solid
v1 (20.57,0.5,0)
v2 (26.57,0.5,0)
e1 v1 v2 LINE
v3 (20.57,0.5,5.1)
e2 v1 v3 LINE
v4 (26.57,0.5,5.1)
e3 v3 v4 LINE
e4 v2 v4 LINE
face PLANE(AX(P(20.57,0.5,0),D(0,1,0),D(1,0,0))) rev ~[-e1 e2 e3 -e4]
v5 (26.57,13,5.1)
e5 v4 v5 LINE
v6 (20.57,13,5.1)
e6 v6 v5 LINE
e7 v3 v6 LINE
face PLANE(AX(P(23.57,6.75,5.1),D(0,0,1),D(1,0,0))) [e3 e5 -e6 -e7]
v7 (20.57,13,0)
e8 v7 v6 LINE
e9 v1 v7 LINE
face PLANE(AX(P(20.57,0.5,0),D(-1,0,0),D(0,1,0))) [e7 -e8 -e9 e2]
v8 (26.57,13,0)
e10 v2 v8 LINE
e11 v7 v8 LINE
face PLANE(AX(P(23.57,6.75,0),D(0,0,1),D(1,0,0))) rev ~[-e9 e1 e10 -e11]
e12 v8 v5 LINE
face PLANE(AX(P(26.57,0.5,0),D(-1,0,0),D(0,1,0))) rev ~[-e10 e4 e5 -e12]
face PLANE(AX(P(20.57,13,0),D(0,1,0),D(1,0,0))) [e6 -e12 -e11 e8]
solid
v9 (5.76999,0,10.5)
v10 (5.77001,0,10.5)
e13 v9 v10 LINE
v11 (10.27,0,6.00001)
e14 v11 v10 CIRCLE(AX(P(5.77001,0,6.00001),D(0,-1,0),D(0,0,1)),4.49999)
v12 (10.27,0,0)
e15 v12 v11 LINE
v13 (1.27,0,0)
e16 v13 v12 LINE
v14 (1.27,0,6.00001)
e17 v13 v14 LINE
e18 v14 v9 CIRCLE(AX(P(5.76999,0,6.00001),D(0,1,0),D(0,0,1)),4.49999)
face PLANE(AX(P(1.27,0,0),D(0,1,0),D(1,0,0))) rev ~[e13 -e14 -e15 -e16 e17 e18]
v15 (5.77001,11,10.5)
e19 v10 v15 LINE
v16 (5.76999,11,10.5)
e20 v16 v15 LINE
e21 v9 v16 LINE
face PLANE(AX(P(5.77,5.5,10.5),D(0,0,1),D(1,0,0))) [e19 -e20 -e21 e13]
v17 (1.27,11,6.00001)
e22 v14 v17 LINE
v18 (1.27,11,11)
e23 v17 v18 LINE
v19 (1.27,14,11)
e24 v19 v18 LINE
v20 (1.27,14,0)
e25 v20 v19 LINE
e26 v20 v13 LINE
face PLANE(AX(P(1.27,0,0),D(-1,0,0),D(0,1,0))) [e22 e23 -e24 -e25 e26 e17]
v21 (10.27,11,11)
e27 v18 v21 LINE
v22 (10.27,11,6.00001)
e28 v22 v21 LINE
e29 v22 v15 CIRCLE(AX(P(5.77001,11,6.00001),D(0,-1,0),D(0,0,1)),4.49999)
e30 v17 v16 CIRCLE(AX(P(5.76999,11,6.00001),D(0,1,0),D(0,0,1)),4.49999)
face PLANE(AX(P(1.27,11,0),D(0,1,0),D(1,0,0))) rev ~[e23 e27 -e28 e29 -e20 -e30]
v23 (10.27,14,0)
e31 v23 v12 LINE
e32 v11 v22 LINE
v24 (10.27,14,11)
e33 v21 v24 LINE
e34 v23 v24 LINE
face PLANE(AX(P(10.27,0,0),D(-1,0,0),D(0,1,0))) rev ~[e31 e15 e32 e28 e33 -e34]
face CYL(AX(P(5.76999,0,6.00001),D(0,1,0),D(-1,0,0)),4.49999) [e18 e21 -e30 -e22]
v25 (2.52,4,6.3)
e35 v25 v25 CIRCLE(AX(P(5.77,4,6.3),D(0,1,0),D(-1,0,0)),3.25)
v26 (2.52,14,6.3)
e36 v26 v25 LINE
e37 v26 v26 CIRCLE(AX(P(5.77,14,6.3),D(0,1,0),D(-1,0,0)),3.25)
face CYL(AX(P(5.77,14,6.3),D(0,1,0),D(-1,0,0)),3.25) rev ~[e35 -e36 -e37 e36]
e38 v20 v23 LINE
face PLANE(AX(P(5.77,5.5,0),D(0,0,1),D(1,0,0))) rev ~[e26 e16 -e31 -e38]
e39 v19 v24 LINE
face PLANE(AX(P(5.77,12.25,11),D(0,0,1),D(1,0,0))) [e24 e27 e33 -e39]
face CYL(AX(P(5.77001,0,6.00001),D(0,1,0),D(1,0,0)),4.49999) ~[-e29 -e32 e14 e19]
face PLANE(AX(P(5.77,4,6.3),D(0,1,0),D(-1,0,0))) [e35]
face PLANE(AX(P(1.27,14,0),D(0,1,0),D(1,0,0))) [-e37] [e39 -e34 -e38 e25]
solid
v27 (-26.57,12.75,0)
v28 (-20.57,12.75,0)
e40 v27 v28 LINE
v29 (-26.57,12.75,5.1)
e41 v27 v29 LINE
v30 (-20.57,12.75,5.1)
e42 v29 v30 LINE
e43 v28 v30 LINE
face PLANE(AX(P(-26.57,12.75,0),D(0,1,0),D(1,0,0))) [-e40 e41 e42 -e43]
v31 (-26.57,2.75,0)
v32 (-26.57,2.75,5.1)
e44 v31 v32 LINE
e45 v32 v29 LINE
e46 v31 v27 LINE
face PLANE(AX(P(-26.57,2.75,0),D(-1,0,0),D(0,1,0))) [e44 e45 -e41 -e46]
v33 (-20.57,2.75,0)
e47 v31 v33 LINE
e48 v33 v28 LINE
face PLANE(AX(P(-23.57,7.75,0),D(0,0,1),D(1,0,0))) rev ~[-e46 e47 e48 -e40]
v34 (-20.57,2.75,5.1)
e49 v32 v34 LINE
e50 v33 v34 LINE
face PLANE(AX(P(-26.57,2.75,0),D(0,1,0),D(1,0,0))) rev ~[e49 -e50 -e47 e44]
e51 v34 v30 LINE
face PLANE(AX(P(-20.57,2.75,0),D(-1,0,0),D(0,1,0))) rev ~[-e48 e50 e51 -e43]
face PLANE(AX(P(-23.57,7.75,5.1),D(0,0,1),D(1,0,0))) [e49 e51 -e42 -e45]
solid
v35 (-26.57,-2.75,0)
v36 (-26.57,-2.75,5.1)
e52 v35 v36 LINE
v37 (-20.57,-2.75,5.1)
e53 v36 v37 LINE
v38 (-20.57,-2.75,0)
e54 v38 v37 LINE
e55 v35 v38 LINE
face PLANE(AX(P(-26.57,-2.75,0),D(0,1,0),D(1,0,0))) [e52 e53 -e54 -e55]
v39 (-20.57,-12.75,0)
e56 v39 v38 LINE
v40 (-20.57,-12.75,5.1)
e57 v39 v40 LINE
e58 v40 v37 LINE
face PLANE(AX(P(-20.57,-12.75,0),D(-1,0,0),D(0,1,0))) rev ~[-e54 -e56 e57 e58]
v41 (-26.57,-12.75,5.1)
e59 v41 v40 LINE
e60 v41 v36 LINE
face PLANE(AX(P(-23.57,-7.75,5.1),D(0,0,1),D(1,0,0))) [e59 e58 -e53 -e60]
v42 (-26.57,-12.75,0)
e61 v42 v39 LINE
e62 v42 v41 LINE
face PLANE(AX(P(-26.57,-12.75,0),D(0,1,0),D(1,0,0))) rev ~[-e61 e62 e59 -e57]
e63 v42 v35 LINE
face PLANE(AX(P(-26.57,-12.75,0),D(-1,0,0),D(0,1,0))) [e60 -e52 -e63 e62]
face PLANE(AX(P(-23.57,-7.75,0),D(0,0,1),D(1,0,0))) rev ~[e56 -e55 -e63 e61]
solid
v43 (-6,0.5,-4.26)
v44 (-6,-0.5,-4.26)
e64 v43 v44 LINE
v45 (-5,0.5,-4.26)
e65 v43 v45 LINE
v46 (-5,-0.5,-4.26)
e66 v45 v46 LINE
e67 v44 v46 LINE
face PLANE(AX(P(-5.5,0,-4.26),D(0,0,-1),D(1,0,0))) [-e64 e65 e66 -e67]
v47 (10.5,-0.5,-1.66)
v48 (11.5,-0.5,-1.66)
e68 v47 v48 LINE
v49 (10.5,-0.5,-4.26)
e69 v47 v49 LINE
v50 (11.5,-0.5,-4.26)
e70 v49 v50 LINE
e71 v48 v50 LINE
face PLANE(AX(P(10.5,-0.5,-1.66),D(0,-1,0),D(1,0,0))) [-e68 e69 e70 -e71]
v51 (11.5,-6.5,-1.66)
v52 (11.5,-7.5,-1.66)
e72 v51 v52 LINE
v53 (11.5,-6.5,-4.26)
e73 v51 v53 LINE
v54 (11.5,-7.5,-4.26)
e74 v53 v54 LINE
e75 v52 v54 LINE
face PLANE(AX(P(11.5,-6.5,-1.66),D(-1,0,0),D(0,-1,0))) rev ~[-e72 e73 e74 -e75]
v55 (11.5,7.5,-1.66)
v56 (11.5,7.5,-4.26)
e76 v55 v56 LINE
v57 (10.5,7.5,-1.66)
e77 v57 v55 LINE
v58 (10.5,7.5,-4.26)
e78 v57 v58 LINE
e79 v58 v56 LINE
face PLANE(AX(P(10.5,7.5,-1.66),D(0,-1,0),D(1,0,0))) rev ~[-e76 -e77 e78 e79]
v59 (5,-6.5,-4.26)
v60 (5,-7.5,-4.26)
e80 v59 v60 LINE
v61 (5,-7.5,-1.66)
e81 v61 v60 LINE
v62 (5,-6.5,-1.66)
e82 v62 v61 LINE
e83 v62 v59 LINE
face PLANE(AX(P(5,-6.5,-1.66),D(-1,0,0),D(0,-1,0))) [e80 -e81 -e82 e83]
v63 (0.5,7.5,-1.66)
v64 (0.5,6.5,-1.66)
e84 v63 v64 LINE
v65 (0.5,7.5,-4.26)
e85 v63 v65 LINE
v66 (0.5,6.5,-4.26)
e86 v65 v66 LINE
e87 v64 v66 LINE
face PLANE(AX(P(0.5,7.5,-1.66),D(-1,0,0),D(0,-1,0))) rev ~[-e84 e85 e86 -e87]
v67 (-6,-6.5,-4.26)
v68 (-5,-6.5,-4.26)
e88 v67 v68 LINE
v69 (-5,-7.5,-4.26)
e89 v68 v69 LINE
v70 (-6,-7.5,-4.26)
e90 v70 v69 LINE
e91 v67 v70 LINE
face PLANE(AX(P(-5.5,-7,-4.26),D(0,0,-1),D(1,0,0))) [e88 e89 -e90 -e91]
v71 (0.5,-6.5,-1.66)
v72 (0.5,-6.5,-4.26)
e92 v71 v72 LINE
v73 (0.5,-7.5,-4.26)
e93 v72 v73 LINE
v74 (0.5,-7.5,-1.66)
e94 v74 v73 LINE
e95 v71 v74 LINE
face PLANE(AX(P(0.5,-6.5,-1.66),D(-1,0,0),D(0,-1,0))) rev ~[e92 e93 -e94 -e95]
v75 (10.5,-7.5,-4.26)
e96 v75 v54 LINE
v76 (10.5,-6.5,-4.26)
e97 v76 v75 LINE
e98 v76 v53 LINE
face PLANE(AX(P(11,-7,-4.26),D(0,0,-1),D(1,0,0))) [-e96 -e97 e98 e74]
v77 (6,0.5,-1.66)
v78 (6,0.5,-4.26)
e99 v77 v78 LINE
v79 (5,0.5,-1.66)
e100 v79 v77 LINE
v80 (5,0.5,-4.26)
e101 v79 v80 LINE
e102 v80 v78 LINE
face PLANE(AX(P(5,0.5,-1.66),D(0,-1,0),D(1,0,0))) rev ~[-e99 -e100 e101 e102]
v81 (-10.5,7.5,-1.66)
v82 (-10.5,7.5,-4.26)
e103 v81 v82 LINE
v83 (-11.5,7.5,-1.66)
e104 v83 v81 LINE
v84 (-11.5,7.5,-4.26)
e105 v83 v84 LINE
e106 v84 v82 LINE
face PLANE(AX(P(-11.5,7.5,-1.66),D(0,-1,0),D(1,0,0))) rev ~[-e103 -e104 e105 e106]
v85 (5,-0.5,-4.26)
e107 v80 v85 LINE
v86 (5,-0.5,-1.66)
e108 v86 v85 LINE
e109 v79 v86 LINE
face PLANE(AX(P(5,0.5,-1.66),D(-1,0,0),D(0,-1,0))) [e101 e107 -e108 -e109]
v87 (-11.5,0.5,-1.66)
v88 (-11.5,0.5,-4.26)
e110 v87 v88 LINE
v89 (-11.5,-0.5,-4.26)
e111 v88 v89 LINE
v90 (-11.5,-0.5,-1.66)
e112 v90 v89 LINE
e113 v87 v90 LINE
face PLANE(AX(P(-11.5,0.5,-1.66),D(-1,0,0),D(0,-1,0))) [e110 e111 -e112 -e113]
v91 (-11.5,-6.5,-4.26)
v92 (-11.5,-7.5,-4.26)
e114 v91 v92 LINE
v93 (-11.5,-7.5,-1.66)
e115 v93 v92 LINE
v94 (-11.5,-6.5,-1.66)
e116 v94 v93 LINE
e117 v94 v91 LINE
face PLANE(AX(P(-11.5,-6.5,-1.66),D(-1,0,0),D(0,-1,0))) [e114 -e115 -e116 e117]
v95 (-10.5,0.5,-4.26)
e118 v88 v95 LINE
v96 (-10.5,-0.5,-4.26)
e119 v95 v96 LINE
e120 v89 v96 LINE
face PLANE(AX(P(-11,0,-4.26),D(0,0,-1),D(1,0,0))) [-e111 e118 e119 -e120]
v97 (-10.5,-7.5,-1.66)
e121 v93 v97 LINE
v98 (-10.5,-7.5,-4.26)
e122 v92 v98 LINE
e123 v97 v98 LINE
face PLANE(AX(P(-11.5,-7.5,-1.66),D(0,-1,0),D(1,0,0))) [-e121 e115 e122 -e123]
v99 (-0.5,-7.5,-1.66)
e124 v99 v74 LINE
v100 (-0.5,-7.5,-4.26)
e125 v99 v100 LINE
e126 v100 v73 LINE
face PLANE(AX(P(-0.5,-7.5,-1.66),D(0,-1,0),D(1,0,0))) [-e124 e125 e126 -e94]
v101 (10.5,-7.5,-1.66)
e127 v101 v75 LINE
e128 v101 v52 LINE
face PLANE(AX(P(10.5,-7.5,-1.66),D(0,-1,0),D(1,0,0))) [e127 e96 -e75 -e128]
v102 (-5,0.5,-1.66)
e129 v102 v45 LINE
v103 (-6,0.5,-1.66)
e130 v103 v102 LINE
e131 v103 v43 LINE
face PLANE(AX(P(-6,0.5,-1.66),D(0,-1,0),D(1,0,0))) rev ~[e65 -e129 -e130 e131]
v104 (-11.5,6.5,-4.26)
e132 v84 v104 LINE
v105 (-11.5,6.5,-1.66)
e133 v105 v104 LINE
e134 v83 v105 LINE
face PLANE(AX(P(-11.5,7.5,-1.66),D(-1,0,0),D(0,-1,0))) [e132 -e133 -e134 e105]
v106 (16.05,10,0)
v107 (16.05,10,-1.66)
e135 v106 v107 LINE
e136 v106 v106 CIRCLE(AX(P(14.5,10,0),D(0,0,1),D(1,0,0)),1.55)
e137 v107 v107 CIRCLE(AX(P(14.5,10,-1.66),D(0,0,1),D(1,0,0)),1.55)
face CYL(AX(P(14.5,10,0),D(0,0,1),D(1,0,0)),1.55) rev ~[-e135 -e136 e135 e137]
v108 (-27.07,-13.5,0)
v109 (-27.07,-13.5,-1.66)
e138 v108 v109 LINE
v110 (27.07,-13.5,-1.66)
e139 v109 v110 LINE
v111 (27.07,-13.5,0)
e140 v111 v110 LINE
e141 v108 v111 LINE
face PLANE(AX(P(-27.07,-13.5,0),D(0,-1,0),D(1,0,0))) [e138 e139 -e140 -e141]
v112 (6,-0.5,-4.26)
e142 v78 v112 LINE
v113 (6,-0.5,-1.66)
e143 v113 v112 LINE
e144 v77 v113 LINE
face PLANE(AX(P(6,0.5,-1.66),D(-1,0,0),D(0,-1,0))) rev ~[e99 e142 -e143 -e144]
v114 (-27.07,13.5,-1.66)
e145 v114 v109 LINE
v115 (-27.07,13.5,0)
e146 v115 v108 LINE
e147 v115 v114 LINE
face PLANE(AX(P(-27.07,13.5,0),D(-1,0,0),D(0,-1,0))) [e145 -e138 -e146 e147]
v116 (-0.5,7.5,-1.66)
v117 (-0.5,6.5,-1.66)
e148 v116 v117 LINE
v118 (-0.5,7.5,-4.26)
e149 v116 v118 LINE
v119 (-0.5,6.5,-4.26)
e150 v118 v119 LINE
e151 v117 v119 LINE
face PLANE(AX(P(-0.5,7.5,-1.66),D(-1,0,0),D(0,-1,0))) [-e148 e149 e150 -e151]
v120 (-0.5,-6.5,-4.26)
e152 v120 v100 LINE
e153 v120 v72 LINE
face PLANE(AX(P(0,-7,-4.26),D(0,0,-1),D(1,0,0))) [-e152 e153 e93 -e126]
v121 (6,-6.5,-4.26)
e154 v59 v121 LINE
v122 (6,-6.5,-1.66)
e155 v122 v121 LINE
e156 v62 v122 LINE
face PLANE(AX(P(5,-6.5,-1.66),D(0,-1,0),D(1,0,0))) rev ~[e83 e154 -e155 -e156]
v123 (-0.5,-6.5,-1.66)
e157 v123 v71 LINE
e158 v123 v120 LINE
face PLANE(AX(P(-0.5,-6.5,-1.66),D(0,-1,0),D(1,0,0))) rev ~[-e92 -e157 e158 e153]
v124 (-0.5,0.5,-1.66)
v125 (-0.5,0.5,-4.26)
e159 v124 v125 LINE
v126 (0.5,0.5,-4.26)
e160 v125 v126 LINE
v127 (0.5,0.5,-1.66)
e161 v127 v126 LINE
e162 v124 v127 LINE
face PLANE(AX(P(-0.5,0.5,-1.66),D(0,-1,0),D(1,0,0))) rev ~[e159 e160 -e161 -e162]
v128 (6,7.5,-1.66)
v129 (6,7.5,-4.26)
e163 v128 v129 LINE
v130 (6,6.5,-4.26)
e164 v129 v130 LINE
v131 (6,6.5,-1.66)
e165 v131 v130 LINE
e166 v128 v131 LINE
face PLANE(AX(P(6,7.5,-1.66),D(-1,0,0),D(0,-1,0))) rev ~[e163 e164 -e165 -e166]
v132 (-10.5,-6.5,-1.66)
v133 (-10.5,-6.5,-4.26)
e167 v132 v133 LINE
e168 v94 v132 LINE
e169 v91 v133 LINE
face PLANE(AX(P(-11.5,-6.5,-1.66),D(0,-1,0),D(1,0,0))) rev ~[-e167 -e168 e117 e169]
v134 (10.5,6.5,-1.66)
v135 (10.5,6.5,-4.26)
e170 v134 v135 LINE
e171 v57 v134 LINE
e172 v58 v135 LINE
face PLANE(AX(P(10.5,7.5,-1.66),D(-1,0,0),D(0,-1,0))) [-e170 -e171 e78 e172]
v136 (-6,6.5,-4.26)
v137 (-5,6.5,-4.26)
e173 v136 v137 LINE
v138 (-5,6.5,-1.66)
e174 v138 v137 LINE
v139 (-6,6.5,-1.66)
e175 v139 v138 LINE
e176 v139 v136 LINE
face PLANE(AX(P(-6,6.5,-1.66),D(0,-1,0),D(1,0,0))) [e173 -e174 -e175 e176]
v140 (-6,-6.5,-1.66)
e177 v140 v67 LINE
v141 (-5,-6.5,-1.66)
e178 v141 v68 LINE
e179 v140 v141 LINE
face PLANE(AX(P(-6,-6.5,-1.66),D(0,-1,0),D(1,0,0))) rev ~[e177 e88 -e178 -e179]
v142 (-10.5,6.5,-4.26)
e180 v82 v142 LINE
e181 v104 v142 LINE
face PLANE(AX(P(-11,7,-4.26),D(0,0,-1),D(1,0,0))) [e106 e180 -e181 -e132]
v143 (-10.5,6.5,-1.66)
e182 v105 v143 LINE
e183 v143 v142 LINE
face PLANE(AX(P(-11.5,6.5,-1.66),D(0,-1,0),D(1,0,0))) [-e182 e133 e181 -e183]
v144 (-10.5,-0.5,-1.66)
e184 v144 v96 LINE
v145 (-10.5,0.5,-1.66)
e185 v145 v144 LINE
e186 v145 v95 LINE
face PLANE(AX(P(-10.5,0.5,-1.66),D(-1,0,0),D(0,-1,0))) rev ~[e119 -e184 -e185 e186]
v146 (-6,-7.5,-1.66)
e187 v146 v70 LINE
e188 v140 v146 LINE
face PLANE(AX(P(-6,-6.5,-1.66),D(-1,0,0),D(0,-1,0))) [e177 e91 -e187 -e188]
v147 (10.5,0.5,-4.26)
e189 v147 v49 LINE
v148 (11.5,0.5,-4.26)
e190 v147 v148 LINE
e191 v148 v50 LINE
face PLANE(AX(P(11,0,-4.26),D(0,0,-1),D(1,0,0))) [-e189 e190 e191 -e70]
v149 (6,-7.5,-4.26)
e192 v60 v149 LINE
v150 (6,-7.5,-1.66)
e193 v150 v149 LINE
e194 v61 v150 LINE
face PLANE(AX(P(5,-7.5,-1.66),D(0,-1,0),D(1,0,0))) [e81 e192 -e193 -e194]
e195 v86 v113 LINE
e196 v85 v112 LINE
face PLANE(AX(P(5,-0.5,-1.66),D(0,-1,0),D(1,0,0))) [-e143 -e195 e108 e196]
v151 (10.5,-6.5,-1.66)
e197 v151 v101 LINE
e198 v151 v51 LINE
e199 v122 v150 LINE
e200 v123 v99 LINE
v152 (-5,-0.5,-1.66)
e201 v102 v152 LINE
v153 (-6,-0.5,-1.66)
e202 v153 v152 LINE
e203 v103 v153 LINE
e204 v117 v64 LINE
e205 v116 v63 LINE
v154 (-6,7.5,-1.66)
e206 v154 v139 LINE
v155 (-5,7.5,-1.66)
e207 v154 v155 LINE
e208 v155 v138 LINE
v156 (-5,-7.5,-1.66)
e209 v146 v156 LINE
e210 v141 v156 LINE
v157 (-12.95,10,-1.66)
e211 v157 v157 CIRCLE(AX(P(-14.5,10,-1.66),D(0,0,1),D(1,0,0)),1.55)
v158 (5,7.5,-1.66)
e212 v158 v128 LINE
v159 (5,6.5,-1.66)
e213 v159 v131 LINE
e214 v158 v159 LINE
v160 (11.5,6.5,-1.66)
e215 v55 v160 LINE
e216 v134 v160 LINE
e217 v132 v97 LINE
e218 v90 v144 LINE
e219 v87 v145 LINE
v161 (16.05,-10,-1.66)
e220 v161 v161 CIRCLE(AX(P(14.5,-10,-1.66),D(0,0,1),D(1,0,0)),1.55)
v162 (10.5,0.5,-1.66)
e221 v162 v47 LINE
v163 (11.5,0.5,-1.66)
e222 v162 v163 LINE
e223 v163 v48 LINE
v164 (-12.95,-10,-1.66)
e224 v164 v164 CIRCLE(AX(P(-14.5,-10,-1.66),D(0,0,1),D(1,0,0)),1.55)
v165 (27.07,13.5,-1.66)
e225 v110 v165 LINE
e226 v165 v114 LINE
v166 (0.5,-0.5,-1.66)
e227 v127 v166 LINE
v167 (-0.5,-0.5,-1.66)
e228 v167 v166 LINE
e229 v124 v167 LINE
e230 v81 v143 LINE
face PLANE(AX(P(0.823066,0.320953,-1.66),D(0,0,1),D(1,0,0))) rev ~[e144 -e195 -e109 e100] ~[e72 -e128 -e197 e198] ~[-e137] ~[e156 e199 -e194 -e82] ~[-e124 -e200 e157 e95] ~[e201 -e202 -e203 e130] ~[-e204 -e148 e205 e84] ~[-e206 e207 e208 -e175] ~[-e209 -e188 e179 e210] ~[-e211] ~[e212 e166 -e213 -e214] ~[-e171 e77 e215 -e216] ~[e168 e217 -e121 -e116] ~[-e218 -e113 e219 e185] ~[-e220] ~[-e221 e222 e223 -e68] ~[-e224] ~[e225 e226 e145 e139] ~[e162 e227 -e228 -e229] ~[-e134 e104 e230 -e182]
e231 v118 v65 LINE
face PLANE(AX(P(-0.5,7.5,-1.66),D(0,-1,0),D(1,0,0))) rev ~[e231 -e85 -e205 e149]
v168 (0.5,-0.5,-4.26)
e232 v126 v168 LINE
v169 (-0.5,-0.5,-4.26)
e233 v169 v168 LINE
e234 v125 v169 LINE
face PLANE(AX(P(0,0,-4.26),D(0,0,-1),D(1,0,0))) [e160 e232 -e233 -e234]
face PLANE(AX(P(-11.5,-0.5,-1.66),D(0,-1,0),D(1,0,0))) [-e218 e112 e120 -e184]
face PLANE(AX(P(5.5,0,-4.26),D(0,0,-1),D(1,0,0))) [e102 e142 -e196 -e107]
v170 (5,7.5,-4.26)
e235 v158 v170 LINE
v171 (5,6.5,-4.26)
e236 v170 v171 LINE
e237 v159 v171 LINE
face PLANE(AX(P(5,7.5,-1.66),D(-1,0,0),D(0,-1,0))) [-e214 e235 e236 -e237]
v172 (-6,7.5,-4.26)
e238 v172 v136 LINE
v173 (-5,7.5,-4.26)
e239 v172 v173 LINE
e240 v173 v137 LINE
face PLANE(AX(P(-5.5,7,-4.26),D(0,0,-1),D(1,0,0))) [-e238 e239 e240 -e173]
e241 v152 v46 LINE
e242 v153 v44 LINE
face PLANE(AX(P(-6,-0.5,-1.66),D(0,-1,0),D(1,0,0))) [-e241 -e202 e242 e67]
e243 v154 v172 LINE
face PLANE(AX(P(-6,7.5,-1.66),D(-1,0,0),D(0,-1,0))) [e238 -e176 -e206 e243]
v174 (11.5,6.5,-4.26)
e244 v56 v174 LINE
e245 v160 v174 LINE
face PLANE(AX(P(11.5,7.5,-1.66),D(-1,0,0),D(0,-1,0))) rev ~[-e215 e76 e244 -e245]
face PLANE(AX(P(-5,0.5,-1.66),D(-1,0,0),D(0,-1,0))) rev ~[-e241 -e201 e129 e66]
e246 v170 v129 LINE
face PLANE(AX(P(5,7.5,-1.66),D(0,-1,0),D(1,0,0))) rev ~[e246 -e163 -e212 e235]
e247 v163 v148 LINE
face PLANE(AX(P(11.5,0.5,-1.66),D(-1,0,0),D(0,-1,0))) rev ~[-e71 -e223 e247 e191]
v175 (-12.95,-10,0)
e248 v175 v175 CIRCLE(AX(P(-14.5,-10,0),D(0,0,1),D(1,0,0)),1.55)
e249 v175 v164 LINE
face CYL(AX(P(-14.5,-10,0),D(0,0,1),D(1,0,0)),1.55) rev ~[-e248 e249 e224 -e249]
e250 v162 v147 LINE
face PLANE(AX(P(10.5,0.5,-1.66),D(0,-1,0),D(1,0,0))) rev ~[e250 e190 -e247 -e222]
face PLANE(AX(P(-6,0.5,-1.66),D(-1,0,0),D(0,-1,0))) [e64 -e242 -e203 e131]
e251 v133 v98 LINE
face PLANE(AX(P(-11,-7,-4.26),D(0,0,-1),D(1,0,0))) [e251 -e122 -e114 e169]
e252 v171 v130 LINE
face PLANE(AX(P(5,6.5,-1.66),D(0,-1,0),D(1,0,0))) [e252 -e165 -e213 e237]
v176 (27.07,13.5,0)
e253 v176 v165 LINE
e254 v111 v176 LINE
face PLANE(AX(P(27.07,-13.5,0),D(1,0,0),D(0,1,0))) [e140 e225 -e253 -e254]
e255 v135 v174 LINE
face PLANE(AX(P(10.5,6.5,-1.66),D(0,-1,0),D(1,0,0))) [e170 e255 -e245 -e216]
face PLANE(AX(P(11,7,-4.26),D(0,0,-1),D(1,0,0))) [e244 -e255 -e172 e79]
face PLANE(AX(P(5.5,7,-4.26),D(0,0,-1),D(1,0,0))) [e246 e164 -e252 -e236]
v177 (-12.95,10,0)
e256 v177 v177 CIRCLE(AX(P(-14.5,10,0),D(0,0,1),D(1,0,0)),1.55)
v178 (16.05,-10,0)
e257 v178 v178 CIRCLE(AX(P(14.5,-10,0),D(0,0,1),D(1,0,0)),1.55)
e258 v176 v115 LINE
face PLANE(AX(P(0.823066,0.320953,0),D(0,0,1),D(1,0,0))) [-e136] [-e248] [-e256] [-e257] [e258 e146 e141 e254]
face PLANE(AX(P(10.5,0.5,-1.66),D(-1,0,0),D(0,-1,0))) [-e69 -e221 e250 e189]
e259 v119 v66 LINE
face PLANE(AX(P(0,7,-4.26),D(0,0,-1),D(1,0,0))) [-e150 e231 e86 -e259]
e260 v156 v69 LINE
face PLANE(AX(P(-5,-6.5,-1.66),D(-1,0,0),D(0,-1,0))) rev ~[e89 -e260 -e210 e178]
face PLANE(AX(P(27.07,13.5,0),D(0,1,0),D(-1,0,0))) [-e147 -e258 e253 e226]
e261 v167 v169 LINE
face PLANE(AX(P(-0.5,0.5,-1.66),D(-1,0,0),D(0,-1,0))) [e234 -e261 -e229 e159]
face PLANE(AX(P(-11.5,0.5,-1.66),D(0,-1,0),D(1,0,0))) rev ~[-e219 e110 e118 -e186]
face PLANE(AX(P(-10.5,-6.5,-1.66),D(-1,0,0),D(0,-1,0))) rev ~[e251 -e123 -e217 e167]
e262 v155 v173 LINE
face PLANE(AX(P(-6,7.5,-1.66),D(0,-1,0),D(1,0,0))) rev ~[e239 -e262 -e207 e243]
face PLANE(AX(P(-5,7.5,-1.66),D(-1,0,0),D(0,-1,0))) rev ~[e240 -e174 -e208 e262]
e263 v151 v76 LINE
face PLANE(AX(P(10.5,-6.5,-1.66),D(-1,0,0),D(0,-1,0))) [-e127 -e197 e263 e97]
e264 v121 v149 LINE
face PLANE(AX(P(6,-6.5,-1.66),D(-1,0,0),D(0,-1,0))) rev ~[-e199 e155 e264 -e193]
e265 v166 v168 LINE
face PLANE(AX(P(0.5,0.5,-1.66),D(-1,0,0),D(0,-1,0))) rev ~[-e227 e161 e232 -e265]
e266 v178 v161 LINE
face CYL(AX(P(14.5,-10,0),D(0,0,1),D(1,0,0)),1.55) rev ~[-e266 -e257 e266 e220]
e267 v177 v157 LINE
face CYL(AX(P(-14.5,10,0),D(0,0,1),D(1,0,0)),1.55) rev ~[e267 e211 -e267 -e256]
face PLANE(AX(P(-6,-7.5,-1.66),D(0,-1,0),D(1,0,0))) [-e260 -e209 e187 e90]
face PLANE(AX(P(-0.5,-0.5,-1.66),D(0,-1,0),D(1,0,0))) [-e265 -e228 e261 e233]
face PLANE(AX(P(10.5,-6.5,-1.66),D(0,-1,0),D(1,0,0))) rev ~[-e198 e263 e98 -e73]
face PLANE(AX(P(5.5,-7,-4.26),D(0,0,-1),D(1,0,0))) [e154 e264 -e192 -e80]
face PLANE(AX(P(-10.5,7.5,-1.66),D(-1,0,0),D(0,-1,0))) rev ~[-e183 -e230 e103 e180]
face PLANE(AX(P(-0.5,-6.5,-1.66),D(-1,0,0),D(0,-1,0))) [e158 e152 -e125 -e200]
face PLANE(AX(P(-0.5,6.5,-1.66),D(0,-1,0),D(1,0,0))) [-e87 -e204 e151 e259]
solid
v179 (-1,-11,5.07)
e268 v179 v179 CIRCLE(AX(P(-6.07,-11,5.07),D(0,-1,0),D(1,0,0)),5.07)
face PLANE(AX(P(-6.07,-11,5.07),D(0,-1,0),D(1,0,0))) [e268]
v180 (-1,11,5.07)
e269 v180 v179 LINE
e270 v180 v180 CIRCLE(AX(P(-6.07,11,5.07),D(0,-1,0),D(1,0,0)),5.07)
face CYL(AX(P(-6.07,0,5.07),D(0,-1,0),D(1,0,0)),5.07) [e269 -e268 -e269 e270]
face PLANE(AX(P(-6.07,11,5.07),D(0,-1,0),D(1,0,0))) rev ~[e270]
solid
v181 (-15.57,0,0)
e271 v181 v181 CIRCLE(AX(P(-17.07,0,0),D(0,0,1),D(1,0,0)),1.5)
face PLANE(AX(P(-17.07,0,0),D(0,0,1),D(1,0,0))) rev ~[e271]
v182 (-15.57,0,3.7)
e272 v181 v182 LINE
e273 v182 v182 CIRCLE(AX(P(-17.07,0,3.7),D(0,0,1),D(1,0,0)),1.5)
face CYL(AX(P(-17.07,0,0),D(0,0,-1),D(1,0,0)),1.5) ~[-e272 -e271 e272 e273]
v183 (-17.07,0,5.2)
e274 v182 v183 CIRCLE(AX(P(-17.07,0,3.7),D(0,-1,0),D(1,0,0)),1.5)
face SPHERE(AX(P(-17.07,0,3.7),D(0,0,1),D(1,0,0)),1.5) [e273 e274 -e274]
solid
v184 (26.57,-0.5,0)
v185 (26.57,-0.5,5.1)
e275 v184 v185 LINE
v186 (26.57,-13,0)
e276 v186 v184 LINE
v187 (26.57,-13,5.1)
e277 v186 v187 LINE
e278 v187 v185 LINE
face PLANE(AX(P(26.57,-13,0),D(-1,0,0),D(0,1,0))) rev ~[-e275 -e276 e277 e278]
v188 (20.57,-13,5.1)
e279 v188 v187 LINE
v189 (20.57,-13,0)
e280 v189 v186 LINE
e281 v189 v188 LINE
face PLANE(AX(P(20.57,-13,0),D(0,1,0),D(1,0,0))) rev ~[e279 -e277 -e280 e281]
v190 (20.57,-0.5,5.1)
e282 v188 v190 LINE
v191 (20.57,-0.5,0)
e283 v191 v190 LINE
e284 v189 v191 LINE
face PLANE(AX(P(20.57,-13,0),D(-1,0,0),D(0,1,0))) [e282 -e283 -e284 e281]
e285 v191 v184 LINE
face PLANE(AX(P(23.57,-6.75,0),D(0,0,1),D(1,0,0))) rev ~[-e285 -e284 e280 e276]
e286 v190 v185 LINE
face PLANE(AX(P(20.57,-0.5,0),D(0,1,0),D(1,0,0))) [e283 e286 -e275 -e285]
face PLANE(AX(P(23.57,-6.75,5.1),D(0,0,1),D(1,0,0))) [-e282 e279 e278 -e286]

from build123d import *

# Parameters (mm, degrees)
F0_W           = 6
F0_H           = 10
F0_R           = 1.55
F0_R_2         = 1.5
F0_W_2         = 10
F0_H_2         = 22
F0_H_3         = 12.5
F0_W_3         = 9
F0_H_4         = 11
F0_H_5         = 2.5
F1_DEPTH       = 1.66
F0_H_6         = 0.5
F2_DEPTH       = 11
F3_DEPTH       = 10.5
F4_R           = 4.49999
F5_R           = 3.25
F6_DEPTH       = 10
F7_DEPTH       = 5.2
F8_R           = 1.5
F9_R           = 5.07
F10_DEPTH      = 11
F10_DEPTH_BACK = 11
F11_DEPTH      = 5.1
F12_W          = 1
F12_H          = 1
F13_DEPTH      = 2.6


# Not quite as in the source:
# - a fillet or chamfer is up to 0.001 mm smaller than in the source, because OpenCascade refuses the exact size


with BuildPart() as f1:
    # F0 (on Top) → F1 (new body)
    with BuildSketch(Plane.XY):
        Polygon((-27.07, -13.5), (27.07, -13.5), (27.07, 13.5), (10.27, 13.5), (10.27, 11), (10.27, 0), (1.27, 0), (1.27, 11), (1.27, 13.5), (-27.07, 13.5), align=None)
        with Locations((-23.57, -7.75)):
            Rectangle(F0_W, F0_H, mode=Mode.SUBTRACT)
        with Locations((-14.5, -10)):
            Circle(F0_R, mode=Mode.SUBTRACT)
        with Locations((-17.07, 0)):
            Circle(F0_R_2, mode=Mode.SUBTRACT)
        with Locations((-6.07, 0)):
            Rectangle(F0_W_2, F0_H_2, mode=Mode.SUBTRACT)
        with Locations((14.5, -10)):
            Circle(F0_R, mode=Mode.SUBTRACT)
        with Locations((23.57, -6.75)):
            Rectangle(F0_W, F0_H_3, mode=Mode.SUBTRACT)
        with Locations((-23.57, 7.75)):
            Rectangle(F0_W, F0_H, mode=Mode.SUBTRACT)
        with Locations((-14.5, 10)):
            Circle(F0_R, mode=Mode.SUBTRACT)
        with Locations((23.57, 6.75)):
            Rectangle(F0_W, F0_H_3, mode=Mode.SUBTRACT)
        with Locations((14.5, 10)):
            Circle(F0_R, mode=Mode.SUBTRACT)
        with Locations((-6.07, 0)):
            Rectangle(F0_W_2, F0_H_2)
        with Locations((5.77, 5.5)):
            Rectangle(F0_W_3, F0_H_4)
        with Locations((23.57, 6.75)):
            Rectangle(F0_W, F0_H_3)
        with Locations((23.57, -6.75)):
            Rectangle(F0_W, F0_H_3)
        with Locations((-23.57, 7.75)):
            Rectangle(F0_W, F0_H)
        with Locations((-23.57, -7.75)):
            Rectangle(F0_W, F0_H)
        with Locations((5.77, 12.25)):
            Rectangle(F0_W_3, F0_H_5)
        with Locations((-17.07, 0)):
            Circle(F0_R_2)
    extrude(amount=-F1_DEPTH)

    # F12 (on face) → F13 (join)
    with BuildSketch(Plane(origin=(0, 0, -1.66), x_dir=(1, 0, 0), z_dir=(0, 0, -1))):
        Rectangle(F12_W, F12_H)
        with Locations((0, 7)):
            Rectangle(F12_W, F12_H)
        with Locations((5.5, 7)):
            Rectangle(F12_W, F12_H)
        with Locations((11, 7)):
            Rectangle(F12_W, F12_H)
        with Locations((11, 0)):
            Rectangle(F12_W, F12_H)
        with Locations((5.5, 0)):
            Rectangle(F12_W, F12_H)
        with Locations((11, -7)):
            Rectangle(F12_W, F12_H)
        with Locations((5.5, -7)):
            Rectangle(F12_W, F12_H)
        with Locations((0, -7)):
            Rectangle(F12_W, F12_H)
        with Locations((-5.5, -7)):
            Rectangle(F12_W, F12_H)
        with Locations((-5.5, 0)):
            Rectangle(F12_W, F12_H)
        with Locations((-5.5, 7)):
            Rectangle(F12_W, F12_H)
        with Locations((-11, 7)):
            Rectangle(F12_W, F12_H)
        with Locations((-11, 0)):
            Rectangle(F12_W, F12_H)
        with Locations((-11, -7)):
            Rectangle(F12_W, F12_H)
    extrude(amount=F13_DEPTH)


with BuildPart() as f2:
    # F0 (on Top) → F2 (new body)
    with BuildSketch(Plane.XY):
        with Locations((5.77, 12.25)):
            Rectangle(F0_W_3, F0_H_5)
        with Locations((5.77, 13.75)):
            Rectangle(F0_W_3, F0_H_6)
    extrude(amount=F2_DEPTH)

    # F0 (on Top) → F3 (join)
    with BuildSketch(Plane.XY):
        with Locations((5.77, 5.5)):
            Rectangle(F0_W_3, F0_H_4)
    extrude(amount=F3_DEPTH)

    # F4 (radius 4.5 in the source; OpenCascade refuses exactly that, so slightly less here)
    f4_edges = [f2.edges().sort_by_distance(p)[0] for p in [
        (1.27, 5.5, 10.5),
        (10.27, 5.5, 10.5),
    ]]
    fillet(f4_edges, radius=F4_R)

    # F5 (on face) → F6 (cut)
    with BuildSketch(Plane(origin=(0, 14, 0), x_dir=(-1, 0, 0), z_dir=(0, 1, 0))):
        with Locations((-5.77, 6.3)):
            Circle(F5_R)
    extrude(amount=-F6_DEPTH, mode=Mode.SUBTRACT)


with BuildPart() as f7:
    # F0 (on Top) → F7 (new body)
    with BuildSketch(Plane.XY):
        with Locations((-17.07, 0)):
            Circle(F0_R_2)
    extrude(amount=F7_DEPTH)

    # F8
    f8_edges = [f7.edges().sort_by_distance(p)[0] for p in [
        (-18.57, 0, 5.2),
    ]]
    fillet(f8_edges, radius=F8_R)


with BuildPart() as f10:
    # F9 (on Front) → F10 (new body, two sides)
    with BuildSketch(Plane.XZ) as f10_sk:
        with Locations((-6.07, 5.07)):
            Circle(F9_R)
    extrude(amount=F10_DEPTH)
    extrude(f10_sk.sketch, amount=-F10_DEPTH_BACK)


with BuildPart() as f11:
    # F0 (on Top) → F11 (new body)
    with BuildSketch(Plane.XY):
        with Locations((23.57, 6.75)):
            Rectangle(F0_W, F0_H_3)
    extrude(amount=F11_DEPTH)


with BuildPart() as f11b:
    # F0 (on Top) → F11, piece 2 (new body)
    with BuildSketch(Plane.XY):
        with Locations((23.57, -6.75)):
            Rectangle(F0_W, F0_H_3)
    extrude(amount=F11_DEPTH)


with BuildPart() as f11c:
    # F0 (on Top) → F11, piece 3 (new body)
    with BuildSketch(Plane.XY):
        with Locations((-23.57, -7.75)):
            Rectangle(F0_W, F0_H)
    extrude(amount=F11_DEPTH)


with BuildPart() as f11d:
    # F0 (on Top) → F11, piece 4 (new body)
    with BuildSketch(Plane.XY):
        with Locations((-23.57, 7.75)):
            Rectangle(F0_W, F0_H)
    extrude(amount=F11_DEPTH)


solid = Compound([f1.part, f2.part, f7.part, f10.part, f11.part, f11b.part, f11c.part, f11d.part])
